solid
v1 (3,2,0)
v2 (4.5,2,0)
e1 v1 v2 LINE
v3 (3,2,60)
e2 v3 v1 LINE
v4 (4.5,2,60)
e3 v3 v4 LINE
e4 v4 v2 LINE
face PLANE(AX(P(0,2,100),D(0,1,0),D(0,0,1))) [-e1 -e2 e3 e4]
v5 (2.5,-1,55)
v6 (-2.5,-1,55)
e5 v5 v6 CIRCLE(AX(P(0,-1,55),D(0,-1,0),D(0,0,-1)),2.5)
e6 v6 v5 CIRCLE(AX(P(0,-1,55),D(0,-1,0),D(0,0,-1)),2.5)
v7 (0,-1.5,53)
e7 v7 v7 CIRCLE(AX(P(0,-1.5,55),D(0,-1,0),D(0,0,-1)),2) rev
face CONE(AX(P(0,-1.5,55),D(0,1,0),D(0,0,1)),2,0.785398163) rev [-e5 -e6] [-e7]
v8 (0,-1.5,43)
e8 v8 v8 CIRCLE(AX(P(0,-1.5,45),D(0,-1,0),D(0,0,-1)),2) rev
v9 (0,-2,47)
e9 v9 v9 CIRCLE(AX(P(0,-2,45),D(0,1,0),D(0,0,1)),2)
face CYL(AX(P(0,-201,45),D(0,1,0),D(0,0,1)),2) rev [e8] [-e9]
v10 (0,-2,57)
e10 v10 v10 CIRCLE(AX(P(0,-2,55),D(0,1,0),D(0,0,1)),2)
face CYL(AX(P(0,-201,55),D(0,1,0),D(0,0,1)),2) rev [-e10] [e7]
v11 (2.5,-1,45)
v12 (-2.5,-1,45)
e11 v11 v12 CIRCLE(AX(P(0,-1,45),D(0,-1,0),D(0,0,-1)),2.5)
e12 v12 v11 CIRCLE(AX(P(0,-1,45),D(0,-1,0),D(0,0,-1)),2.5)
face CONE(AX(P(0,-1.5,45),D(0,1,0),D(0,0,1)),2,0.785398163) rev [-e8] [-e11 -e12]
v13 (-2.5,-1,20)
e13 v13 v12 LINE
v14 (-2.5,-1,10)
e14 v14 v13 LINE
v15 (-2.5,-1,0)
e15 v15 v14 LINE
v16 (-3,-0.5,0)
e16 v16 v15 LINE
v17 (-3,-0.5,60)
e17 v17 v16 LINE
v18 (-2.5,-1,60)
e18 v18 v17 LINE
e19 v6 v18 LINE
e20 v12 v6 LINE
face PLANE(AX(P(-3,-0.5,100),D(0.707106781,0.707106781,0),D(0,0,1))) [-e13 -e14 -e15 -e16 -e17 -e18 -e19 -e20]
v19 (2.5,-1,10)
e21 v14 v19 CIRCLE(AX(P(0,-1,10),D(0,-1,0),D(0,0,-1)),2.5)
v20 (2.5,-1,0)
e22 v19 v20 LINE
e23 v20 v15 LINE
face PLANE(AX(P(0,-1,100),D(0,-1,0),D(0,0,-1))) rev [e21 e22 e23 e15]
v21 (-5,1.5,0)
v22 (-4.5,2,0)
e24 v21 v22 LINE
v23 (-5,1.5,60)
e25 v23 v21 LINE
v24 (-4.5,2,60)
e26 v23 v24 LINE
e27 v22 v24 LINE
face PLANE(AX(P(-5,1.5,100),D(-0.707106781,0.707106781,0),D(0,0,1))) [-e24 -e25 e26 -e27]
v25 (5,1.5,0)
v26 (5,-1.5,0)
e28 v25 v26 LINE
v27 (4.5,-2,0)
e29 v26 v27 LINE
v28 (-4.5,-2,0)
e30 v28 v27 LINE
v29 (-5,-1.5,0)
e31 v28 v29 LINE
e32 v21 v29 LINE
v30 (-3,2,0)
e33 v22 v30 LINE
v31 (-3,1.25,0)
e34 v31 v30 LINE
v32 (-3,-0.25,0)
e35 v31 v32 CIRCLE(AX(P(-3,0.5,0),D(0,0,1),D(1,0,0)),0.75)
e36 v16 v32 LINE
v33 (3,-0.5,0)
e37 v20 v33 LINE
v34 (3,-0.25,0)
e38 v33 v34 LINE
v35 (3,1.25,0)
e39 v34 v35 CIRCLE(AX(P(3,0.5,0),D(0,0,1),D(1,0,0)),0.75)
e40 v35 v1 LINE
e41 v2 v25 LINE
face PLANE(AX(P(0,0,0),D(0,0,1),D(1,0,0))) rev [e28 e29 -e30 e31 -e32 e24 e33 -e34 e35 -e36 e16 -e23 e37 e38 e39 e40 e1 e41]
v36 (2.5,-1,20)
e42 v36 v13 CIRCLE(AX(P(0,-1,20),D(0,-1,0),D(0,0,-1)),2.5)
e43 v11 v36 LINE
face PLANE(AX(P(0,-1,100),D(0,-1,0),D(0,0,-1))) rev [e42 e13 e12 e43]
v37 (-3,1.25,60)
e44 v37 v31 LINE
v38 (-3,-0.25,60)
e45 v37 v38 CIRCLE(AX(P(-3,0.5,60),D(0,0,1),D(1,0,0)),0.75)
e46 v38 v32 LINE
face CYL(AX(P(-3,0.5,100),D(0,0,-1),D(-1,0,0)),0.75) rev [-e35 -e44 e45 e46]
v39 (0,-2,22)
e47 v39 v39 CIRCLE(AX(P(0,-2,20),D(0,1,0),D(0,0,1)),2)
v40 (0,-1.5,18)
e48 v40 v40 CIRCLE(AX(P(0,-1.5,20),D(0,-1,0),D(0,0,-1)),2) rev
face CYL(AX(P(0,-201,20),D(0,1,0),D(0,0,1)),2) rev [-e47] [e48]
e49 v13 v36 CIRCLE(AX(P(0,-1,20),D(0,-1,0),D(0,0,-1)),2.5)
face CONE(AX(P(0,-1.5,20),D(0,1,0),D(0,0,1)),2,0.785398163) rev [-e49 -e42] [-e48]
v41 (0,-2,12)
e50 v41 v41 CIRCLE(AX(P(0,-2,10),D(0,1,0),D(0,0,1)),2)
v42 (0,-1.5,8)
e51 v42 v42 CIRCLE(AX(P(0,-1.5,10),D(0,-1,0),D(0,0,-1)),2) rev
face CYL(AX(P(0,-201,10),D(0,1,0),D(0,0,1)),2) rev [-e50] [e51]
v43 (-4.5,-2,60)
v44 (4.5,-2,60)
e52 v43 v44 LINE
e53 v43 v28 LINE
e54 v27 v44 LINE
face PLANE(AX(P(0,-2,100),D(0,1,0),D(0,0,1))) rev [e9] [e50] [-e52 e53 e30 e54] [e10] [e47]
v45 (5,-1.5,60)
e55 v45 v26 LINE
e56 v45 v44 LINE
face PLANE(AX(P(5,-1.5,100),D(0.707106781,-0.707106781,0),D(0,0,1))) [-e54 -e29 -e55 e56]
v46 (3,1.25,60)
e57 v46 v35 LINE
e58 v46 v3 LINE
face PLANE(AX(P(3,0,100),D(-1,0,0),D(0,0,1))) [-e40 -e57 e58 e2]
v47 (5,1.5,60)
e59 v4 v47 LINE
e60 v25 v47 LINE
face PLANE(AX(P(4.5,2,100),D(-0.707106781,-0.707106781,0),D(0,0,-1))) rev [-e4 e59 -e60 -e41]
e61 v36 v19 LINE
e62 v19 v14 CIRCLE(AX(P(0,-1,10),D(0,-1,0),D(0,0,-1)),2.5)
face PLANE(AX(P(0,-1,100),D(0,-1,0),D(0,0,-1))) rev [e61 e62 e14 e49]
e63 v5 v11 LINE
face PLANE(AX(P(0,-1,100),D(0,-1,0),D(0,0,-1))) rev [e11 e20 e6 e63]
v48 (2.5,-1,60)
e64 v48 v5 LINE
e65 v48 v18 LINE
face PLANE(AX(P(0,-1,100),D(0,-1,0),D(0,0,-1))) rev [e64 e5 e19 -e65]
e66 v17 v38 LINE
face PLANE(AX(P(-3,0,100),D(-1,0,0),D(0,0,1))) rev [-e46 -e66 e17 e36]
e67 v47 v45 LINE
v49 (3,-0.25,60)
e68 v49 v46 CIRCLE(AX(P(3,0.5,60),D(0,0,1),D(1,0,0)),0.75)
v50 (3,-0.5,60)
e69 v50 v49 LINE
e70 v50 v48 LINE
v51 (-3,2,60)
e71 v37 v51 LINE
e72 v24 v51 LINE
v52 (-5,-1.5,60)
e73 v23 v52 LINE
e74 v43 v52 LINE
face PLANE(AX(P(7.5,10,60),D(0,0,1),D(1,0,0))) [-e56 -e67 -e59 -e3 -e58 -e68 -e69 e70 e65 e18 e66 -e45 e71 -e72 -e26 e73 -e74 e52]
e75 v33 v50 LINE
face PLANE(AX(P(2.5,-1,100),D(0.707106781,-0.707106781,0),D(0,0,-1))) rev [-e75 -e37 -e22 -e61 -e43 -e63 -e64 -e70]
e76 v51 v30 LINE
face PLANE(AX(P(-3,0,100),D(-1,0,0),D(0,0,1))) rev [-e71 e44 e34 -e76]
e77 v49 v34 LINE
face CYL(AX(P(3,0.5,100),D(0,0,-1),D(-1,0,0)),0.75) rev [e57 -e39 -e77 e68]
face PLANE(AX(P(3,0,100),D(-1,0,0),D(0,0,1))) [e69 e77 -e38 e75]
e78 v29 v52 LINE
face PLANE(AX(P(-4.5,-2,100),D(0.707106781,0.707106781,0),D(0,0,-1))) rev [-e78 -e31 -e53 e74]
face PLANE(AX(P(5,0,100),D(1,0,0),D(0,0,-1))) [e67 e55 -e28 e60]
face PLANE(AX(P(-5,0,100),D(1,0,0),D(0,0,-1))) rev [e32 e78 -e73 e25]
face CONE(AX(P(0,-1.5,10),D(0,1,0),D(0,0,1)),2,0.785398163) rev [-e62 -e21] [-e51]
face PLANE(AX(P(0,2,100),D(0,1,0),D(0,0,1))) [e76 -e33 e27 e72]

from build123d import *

# Parameters (mm, degrees)
BOSS_EXTRUDE1_DEPTH        = 100
CHAMFER1_SIZE              = 0.5
SKETCH5_R                  = 2
CUT_EXTRUDE1_DEPTH         = 200
CHAMFER2_SIZE              = 0.5
LPATTERN1_COUNT            = 3
LPATTERN1_PITCH            = 35
CHAMFER2_OF_LPATTERN1_SIZE = 0.5
CUT_EXTRUDE2_DEPTH         = 10
CUT_EXTRUDE2_DEPTH_BACK    = 10
SKETCH6_W                  = 15
SKETCH6_H                  = 40


with BuildPart() as part:
    # Sketch1 → Boss-Extrude1 (new body)
    with BuildSketch(Plane.XY):
        with BuildLine():
            Line((-3, 2), (-5, 2))
            Line((-5, 2), (-5, -2))
            Line((-5, -2), (5, -2))
            Line((5, -2), (5, 2))
            Line((5, 2), (3, 2))
            Line((3, 2), (3, 1.25))
            ThreePointArc((3, 1.25), (3.530330086, 1.030330086), (3.75, 0.5))
            ThreePointArc((3.75, 0.5), (3.530330086, -0.030330086), (3, -0.25))
            Line((3, -0.25), (3, -1))
            Line((3, -1), (-3, -1))
            Line((-3, -1), (-3, -0.25))
            ThreePointArc((-3, -0.25), (-3.75, 0.5), (-3, 1.25))
            Line((-3, 1.25), (-3, 2))
        make_face()
    extrude(amount=BOSS_EXTRUDE1_DEPTH)

    # Chamfer1
    chamfer1_edges = [part.edges().sort_by_distance(p)[0] for p in [
        (-3, -1, 50),
        (3, -1, 50),
        (5, 2, 50),
        (5, -2, 50),
        (-5, -2, 50),
        (-5, 2, 50),
    ]]
    chamfer(chamfer1_edges, length=CHAMFER1_SIZE)

    # Sketch5 → Cut-Extrude1 (cut)
    with BuildSketch(Plane(origin=(0, -1, 0), x_dir=(1, 0, 0), z_dir=(0, 1, 0))):
        with Locations(Location((0, -10, 0), (0, 0, 270))):
            Circle(SKETCH5_R)
        with Locations(Location((0, -20, 0), (0, 0, 270))):
            Circle(SKETCH5_R)
    cut_extrude1 = extrude(amount=-CUT_EXTRUDE1_DEPTH, mode=Mode.SUBTRACT)

    # Chamfer2
    chamfer2_edges = [part.edges().sort_by_distance(p)[0] for p in [
        (0, -1, 8),
        (0, -1, 18),
    ]]
    chamfer(chamfer2_edges, length=CHAMFER2_SIZE - 0.0001)  # a hair under: the kernel refuses the full size

    # LPattern1: Cut-Extrude1 ×3
    with Locations(*[(0, 0, i * LPATTERN1_PITCH) for i in range(1, LPATTERN1_COUNT)]):
        add(cut_extrude1, mode=Mode.SUBTRACT)

    # Chamfer2 of LPattern1
    chamfer2_of_lpattern1_edges = [part.edges().sort_by_distance(p)[0] for p in [
        (0, -1, 43),
        (0, -1, 53),
        (0, -1, 78),
        (0, -1, 88),
    ]]
    chamfer(chamfer2_of_lpattern1_edges, length=CHAMFER2_OF_LPATTERN1_SIZE - 0.0001)  # a hair under: the kernel refuses the full size

    # Sketch6 → Cut-Extrude2 (cut, two sides: drawn at the far end of the back side and taken through both)
    with BuildSketch(Plane(origin=(0, 0, 0), x_dir=(1, 0, 0), z_dir=(0, 1, 0)).offset(-CUT_EXTRUDE2_DEPTH_BACK)):
        with Locations((0, -80)):
            Rectangle(SKETCH6_W, SKETCH6_H)
    extrude(amount=CUT_EXTRUDE2_DEPTH + CUT_EXTRUDE2_DEPTH_BACK, mode=Mode.SUBTRACT)


solid = part.part
